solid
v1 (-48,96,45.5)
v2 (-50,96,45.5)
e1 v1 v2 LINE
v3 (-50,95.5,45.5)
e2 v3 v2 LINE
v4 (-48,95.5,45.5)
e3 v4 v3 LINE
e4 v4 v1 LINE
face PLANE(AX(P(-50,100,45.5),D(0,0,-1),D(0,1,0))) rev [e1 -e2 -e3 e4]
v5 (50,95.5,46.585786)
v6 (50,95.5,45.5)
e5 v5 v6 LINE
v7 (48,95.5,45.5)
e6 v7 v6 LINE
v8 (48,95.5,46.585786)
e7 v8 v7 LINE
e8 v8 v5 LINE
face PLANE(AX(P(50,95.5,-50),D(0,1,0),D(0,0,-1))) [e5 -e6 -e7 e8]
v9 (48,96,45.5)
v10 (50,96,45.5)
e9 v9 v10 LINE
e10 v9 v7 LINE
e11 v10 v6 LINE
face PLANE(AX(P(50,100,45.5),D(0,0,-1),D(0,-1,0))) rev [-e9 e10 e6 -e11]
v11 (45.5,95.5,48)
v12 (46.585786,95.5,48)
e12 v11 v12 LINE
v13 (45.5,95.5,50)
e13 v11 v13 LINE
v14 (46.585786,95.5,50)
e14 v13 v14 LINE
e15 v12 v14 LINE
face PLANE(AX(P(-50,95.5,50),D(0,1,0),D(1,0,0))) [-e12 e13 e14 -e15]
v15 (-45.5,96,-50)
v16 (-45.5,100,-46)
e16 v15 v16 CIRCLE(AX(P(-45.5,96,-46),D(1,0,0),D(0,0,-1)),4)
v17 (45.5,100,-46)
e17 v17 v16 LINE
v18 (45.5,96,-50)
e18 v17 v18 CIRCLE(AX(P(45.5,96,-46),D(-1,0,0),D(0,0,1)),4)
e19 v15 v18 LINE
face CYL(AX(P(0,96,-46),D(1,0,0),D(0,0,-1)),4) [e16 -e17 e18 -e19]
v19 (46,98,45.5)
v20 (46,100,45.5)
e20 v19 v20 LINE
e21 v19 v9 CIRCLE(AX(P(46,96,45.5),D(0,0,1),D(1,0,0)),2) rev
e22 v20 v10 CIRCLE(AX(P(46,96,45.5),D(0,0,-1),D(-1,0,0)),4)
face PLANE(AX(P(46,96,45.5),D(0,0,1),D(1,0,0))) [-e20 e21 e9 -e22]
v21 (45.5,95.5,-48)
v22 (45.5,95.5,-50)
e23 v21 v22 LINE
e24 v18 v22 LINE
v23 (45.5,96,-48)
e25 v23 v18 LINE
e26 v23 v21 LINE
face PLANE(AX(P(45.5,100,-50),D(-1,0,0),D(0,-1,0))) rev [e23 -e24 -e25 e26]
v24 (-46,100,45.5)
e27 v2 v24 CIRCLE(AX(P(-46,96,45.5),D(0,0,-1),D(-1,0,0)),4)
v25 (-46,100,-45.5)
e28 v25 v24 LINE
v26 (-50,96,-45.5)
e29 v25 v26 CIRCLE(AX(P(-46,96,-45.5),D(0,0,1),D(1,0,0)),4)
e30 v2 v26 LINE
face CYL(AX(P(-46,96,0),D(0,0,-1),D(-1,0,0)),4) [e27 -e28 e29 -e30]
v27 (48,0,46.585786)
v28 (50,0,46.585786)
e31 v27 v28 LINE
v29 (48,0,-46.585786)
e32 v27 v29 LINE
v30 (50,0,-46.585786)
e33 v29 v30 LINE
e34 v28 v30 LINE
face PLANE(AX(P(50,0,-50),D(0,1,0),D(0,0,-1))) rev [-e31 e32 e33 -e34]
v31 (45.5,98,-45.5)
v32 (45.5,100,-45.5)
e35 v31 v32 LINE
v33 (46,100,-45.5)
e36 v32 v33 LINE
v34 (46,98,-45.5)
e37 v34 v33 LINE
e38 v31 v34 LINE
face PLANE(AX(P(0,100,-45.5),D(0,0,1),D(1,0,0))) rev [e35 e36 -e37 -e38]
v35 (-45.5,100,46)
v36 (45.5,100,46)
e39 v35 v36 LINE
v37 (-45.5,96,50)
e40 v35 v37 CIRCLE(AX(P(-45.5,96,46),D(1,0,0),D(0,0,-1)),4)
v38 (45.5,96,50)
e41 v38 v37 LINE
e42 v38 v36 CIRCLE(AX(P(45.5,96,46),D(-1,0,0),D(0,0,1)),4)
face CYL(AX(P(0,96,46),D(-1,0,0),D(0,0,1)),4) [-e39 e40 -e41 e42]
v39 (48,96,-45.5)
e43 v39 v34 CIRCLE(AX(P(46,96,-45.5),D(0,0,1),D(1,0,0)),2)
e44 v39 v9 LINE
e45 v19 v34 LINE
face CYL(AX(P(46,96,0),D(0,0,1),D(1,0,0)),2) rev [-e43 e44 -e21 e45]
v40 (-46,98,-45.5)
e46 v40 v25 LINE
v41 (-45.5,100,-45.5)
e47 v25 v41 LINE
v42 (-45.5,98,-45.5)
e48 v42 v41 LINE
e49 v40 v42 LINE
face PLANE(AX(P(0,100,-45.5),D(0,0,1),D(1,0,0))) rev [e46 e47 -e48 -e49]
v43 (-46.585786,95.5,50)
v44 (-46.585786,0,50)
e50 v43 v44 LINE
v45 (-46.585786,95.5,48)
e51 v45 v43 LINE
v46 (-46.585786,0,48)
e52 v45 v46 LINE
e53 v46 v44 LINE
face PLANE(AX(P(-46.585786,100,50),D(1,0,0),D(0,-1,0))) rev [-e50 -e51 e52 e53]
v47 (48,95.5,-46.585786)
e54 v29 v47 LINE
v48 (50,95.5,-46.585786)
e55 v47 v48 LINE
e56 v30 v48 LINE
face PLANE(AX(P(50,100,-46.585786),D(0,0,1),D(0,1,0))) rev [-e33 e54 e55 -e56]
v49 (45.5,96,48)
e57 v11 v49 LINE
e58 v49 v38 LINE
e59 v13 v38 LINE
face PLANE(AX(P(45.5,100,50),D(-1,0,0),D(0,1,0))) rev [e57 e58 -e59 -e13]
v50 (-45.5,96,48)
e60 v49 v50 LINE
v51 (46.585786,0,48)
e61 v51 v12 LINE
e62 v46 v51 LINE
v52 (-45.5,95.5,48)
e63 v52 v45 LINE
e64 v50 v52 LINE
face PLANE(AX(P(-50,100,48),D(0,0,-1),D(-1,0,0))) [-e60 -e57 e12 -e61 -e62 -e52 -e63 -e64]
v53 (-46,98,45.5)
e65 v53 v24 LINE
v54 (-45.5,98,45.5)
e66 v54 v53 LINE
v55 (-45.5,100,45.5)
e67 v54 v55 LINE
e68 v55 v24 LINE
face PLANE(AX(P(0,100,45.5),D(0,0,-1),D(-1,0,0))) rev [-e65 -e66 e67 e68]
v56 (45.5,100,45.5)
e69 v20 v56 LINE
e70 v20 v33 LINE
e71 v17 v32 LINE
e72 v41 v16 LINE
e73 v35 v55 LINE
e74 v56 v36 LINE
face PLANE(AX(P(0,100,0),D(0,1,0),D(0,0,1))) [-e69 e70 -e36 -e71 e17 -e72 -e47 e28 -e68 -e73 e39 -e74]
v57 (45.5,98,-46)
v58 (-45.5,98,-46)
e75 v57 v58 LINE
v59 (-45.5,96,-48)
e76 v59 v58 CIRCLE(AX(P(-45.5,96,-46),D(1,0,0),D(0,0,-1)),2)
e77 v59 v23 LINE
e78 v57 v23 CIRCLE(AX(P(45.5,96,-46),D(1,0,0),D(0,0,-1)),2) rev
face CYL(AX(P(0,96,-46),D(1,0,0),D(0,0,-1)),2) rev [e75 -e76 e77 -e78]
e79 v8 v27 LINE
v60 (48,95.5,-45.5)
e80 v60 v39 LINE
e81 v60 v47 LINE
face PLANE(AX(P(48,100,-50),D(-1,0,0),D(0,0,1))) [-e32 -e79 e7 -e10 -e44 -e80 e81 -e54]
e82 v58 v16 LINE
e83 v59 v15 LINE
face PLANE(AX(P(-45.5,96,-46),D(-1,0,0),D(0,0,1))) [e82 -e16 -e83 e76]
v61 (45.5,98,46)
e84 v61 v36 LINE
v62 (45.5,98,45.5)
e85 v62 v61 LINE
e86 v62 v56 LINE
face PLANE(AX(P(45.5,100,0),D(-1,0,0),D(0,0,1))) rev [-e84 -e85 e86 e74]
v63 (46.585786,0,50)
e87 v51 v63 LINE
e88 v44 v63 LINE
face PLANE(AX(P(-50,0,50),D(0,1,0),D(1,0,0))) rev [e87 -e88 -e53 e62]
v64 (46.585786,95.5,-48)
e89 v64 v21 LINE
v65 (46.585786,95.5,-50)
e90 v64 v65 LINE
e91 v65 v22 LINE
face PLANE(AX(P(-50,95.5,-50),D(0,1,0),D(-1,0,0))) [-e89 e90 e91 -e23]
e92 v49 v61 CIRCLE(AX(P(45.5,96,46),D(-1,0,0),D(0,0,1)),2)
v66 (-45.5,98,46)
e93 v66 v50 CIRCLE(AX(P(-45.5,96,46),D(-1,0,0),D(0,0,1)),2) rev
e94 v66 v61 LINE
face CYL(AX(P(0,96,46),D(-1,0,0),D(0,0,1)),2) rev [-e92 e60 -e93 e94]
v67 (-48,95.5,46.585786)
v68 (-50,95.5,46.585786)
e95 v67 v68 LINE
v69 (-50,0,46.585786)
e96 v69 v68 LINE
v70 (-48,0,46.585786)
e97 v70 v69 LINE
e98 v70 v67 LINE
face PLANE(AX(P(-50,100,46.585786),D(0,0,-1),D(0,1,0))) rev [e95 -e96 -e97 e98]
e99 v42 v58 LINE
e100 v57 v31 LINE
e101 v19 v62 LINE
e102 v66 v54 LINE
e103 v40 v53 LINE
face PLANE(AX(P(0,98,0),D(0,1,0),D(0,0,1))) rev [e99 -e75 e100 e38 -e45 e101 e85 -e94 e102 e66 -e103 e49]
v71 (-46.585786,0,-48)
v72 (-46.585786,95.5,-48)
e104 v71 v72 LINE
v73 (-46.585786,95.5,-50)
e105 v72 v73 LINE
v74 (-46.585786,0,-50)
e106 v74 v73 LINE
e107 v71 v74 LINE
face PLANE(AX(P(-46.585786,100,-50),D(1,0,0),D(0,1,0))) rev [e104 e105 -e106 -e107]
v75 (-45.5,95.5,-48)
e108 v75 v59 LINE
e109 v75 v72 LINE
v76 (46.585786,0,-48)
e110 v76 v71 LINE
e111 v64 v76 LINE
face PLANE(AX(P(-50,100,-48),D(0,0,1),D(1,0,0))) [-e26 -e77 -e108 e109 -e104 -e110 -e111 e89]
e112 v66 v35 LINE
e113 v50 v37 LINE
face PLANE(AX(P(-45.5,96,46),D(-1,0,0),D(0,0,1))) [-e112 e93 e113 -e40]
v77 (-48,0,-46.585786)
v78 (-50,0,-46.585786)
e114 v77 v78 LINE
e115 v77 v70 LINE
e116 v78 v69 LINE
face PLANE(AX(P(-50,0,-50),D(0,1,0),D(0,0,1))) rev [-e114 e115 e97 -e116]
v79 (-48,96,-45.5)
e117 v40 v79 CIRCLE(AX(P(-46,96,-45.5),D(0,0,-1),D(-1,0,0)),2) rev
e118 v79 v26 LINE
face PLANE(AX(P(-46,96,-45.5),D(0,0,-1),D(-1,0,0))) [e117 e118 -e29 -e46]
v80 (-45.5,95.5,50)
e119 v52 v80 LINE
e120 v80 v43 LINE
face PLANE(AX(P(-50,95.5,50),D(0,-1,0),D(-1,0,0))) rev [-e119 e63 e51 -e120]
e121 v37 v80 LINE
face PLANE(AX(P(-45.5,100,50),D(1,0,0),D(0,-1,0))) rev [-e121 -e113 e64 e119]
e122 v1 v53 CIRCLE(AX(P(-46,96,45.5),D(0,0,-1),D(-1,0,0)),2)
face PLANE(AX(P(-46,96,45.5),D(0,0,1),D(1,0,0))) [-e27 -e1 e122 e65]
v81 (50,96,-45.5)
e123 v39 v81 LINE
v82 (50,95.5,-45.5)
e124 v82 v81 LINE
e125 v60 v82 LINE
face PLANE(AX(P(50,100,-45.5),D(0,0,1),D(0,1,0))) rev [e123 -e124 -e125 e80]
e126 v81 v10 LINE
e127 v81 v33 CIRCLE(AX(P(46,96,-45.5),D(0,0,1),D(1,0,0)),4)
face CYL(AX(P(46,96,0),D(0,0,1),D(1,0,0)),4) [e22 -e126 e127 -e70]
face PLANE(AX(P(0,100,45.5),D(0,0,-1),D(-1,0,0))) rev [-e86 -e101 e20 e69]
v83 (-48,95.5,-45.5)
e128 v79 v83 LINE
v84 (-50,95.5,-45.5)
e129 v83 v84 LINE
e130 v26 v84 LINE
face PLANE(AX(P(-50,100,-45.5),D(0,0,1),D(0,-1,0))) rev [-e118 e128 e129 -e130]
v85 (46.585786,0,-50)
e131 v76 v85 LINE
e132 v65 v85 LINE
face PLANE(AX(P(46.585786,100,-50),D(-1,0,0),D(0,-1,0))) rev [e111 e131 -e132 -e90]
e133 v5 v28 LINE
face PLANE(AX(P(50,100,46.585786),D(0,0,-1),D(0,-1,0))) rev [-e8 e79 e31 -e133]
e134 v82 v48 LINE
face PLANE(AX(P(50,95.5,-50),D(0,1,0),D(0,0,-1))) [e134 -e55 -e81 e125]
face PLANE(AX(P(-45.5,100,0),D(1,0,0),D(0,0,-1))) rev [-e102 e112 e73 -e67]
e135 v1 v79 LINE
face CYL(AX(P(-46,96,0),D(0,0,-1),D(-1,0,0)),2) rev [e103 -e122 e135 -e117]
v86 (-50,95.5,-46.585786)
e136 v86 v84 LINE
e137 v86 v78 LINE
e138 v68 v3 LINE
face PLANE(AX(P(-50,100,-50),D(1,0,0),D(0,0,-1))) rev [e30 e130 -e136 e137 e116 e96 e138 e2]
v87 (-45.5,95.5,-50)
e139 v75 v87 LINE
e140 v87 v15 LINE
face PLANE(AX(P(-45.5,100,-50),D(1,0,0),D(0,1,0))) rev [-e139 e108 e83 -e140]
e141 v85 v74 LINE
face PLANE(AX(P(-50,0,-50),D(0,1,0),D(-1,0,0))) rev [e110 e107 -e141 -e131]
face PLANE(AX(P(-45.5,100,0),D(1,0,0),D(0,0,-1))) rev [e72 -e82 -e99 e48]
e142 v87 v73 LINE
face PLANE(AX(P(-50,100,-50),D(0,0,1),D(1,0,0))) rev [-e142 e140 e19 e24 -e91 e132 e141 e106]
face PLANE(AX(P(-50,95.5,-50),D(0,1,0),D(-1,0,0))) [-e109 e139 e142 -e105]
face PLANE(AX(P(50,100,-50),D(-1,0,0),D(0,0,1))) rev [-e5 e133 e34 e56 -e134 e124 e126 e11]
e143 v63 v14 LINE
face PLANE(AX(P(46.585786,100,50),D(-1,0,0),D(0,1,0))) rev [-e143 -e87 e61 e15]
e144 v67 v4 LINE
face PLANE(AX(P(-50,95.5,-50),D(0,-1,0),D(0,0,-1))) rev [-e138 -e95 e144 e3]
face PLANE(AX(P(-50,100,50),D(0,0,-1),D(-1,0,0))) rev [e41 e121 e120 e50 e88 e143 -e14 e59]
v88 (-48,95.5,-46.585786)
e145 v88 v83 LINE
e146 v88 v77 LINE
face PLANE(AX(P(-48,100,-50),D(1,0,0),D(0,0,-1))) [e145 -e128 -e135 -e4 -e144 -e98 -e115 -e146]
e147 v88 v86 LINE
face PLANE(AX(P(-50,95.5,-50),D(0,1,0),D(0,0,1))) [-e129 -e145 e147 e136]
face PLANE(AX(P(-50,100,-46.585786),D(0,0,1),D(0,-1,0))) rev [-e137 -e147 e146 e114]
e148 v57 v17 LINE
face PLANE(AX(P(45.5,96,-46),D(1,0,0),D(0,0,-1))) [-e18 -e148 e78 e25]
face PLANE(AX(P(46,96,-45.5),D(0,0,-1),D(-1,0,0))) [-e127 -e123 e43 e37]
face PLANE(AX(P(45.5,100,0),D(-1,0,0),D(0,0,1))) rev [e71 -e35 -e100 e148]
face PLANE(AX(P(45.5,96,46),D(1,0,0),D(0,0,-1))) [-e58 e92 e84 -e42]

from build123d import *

# Parameters (mm, degrees)
SKETCH_1_W            = 100
SKETCH_1_H            = 100
EXTRUDE_1_DEPTH       = 100
SHELL_1_T             = -2
SHEET_START           = -51
SHEET_METAL_1_DEPTH   = 4.414213562
SHEET_START_2         = 46.585786438
SHEET_METAL_1_2_DEPTH = 4.414213562
SHEET_START_3         = -46.585786438
SHEET_METAL_1_3_DEPTH = 93.171572876
SHEET_METAL_1_4_DEPTH = 1.085786438
SHEET_START_4         = 45.5
SHEET_METAL_1_5_DEPTH = 1.085786438
SHEET_START_5         = -45.5
SHEET_METAL_1_6_DEPTH = 91
SHEET_METAL_1_7_DEPTH = 91
SHEET_METAL_1_8_DEPTH = 91


with BuildPart() as part:
    # Sketch 1 → 凸台-拉伸1 (new body)
    with BuildSketch(Plane(origin=(0, 0, 0), x_dir=(1, 0, 0), z_dir=(0, 1, 0))):
        Rectangle(SKETCH_1_W, SKETCH_1_H)
    extrude(amount=EXTRUDE_1_DEPTH)

    # 抽壳1
    shell_1_openings = [part.faces().sort_by_distance(p)[0] for p in [
        (0, 0, 0),
    ]]
    offset(amount=SHELL_1_T, openings=shell_1_openings, kind=Kind.INTERSECTION)

    # Sheet Metal 1: read off the stored shape, not the designer's step
    # Sheet Metal 1 outline → Sheet Metal 1 (cut)
    with BuildSketch(Plane.YZ.offset(SHEET_START)):
        Polygon((0, 50), (0, 46.585786438), (95.5, 46.585786438), (95.5, 45.5), (100, 45.5), (100, 50), align=None)
        Polygon((0, -46.585786438), (0, -50), (100, -50), (100, -45.5), (95.5, -45.5), (95.5, -46.585786438), align=None)
    extrude(amount=SHEET_METAL_1_DEPTH, mode=Mode.SUBTRACT)

    # Sheet Metal 1 2 outline → Sheet Metal 1 2 (cut)
    with BuildSketch(Plane.YZ.offset(SHEET_START_2)):
        Polygon((0, 50), (0, 46.585786438), (95.5, 46.585786438), (95.5, 45.5), (100, 45.5), (100, 50), align=None)
        Polygon((0, -46.585786438), (0, -50), (100, -50), (100, -45.5), (95.5, -45.5), (95.5, -46.585786438), align=None)
    extrude(amount=SHEET_METAL_1_2_DEPTH, mode=Mode.SUBTRACT)

    # Sheet Metal 1 3 outline → Sheet Metal 1 3 (cut)
    with BuildSketch(Plane.YZ.offset(SHEET_START_3)):
        with BuildLine():
            ThreePointArc((96, 50), (98.828427125, 48.828427125), (100, 46))
            Line((100, 46), (100, 50))
            Line((100, 50), (96, 50))
        make_face()
        with BuildLine():
            Line((100, -50), (100, -46))
            ThreePointArc((100, -46), (98.828427125, -48.828427125), (96, -50))
            Line((96, -50), (100, -50))
        make_face()
    extrude(amount=SHEET_METAL_1_3_DEPTH, mode=Mode.SUBTRACT)

    # Sheet Metal 1 4 outline → Sheet Metal 1 4 (cut)
    with BuildSketch(Plane.YZ.offset(SHEET_START_3)):
        with BuildLine():
            Line((98, 48), (98, 45.5))
            Line((98, 45.5), (100, 45.5))
            Line((100, 45.5), (100, 46))
            ThreePointArc((100, 46), (98.828427125, 48.828427125), (96, 50))
            Line((96, 50), (95.5, 50))
            Line((95.5, 50), (95.5, 48))
            Line((95.5, 48), (98, 48))
        make_face()
        with BuildLine():
            Line((100, -45.5), (98, -45.5))
            Line((98, -45.5), (98, -48))
            Line((98, -48), (95.5, -48))
            Line((95.5, -48), (95.5, -50))
            Line((95.5, -50), (96, -50))
            ThreePointArc((96, -50), (98.828427125, -48.828427125), (100, -46))
            Line((100, -46), (100, -45.5))
        make_face()
    extrude(amount=SHEET_METAL_1_4_DEPTH, mode=Mode.SUBTRACT)

    # Sheet Metal 1 5 outline → Sheet Metal 1 5 (cut)
    with BuildSketch(Plane.YZ.offset(SHEET_START_4)):
        with BuildLine():
            Line((98, 48), (98, 45.5))
            Line((98, 45.5), (100, 45.5))
            Line((100, 45.5), (100, 46))
            ThreePointArc((100, 46), (98.828427125, 48.828427125), (96, 50))
            Line((96, 50), (95.5, 50))
            Line((95.5, 50), (95.5, 48))
            Line((95.5, 48), (98, 48))
        make_face()
        with BuildLine():
            Line((100, -45.5), (98, -45.5))
            Line((98, -45.5), (98, -48))
            Line((98, -48), (95.5, -48))
            Line((95.5, -48), (95.5, -50))
            Line((95.5, -50), (96, -50))
            ThreePointArc((96, -50), (98.828427125, -48.828427125), (100, -46))
            Line((100, -46), (100, -45.5))
        make_face()
    extrude(amount=SHEET_METAL_1_5_DEPTH, mode=Mode.SUBTRACT)

    # Sheet Metal 1 6 outline → Sheet Metal 1 6 (add)
    with BuildSketch(Plane.YZ.offset(SHEET_START_5)):
        with BuildLine():
            ThreePointArc((96, 48), (97.414213562, 47.414213562), (98, 46))
            Line((98, 46), (98, 48))
            Line((98, 48), (96, 48))
        make_face()
        with BuildLine():
            Line((98, -48), (98, -46))
            ThreePointArc((98, -46), (97.414213562, -47.414213562), (96, -48))
            Line((96, -48), (98, -48))
        make_face()
    extrude(amount=SHEET_METAL_1_6_DEPTH)

    # Sheet Metal 1 7 outline → Sheet Metal 1 7 (cut)
    with BuildSketch(Plane.XY.offset(SHEET_START_5)):
        with BuildLine():
            Line((-50, 100), (-50, 96))
            ThreePointArc((-50, 96), (-48.828427125, 98.828427125), (-46, 100))
            Line((-46, 100), (-50, 100))
        make_face()
        with BuildLine():
            Line((50, 100), (46, 100))
            ThreePointArc((46, 100), (48.828427125, 98.828427125), (50, 96))
            Line((50, 96), (50, 100))
        make_face()
    extrude(amount=SHEET_METAL_1_7_DEPTH, mode=Mode.SUBTRACT)

    # Sheet Metal 1 8 outline → Sheet Metal 1 8 (add)
    with BuildSketch(Plane.XY.offset(SHEET_START_5)):
        with BuildLine():
            Line((-48, 98), (-48, 96))
            ThreePointArc((-48, 96), (-47.414213562, 97.414213562), (-46, 98))
            Line((-46, 98), (-48, 98))
        make_face()
        with BuildLine():
            Line((48, 98), (46, 98))
            ThreePointArc((46, 98), (47.414213562, 97.414213562), (48, 96))
            Line((48, 96), (48, 98))
        make_face()
    extrude(amount=SHEET_METAL_1_8_DEPTH)


solid = part.part
